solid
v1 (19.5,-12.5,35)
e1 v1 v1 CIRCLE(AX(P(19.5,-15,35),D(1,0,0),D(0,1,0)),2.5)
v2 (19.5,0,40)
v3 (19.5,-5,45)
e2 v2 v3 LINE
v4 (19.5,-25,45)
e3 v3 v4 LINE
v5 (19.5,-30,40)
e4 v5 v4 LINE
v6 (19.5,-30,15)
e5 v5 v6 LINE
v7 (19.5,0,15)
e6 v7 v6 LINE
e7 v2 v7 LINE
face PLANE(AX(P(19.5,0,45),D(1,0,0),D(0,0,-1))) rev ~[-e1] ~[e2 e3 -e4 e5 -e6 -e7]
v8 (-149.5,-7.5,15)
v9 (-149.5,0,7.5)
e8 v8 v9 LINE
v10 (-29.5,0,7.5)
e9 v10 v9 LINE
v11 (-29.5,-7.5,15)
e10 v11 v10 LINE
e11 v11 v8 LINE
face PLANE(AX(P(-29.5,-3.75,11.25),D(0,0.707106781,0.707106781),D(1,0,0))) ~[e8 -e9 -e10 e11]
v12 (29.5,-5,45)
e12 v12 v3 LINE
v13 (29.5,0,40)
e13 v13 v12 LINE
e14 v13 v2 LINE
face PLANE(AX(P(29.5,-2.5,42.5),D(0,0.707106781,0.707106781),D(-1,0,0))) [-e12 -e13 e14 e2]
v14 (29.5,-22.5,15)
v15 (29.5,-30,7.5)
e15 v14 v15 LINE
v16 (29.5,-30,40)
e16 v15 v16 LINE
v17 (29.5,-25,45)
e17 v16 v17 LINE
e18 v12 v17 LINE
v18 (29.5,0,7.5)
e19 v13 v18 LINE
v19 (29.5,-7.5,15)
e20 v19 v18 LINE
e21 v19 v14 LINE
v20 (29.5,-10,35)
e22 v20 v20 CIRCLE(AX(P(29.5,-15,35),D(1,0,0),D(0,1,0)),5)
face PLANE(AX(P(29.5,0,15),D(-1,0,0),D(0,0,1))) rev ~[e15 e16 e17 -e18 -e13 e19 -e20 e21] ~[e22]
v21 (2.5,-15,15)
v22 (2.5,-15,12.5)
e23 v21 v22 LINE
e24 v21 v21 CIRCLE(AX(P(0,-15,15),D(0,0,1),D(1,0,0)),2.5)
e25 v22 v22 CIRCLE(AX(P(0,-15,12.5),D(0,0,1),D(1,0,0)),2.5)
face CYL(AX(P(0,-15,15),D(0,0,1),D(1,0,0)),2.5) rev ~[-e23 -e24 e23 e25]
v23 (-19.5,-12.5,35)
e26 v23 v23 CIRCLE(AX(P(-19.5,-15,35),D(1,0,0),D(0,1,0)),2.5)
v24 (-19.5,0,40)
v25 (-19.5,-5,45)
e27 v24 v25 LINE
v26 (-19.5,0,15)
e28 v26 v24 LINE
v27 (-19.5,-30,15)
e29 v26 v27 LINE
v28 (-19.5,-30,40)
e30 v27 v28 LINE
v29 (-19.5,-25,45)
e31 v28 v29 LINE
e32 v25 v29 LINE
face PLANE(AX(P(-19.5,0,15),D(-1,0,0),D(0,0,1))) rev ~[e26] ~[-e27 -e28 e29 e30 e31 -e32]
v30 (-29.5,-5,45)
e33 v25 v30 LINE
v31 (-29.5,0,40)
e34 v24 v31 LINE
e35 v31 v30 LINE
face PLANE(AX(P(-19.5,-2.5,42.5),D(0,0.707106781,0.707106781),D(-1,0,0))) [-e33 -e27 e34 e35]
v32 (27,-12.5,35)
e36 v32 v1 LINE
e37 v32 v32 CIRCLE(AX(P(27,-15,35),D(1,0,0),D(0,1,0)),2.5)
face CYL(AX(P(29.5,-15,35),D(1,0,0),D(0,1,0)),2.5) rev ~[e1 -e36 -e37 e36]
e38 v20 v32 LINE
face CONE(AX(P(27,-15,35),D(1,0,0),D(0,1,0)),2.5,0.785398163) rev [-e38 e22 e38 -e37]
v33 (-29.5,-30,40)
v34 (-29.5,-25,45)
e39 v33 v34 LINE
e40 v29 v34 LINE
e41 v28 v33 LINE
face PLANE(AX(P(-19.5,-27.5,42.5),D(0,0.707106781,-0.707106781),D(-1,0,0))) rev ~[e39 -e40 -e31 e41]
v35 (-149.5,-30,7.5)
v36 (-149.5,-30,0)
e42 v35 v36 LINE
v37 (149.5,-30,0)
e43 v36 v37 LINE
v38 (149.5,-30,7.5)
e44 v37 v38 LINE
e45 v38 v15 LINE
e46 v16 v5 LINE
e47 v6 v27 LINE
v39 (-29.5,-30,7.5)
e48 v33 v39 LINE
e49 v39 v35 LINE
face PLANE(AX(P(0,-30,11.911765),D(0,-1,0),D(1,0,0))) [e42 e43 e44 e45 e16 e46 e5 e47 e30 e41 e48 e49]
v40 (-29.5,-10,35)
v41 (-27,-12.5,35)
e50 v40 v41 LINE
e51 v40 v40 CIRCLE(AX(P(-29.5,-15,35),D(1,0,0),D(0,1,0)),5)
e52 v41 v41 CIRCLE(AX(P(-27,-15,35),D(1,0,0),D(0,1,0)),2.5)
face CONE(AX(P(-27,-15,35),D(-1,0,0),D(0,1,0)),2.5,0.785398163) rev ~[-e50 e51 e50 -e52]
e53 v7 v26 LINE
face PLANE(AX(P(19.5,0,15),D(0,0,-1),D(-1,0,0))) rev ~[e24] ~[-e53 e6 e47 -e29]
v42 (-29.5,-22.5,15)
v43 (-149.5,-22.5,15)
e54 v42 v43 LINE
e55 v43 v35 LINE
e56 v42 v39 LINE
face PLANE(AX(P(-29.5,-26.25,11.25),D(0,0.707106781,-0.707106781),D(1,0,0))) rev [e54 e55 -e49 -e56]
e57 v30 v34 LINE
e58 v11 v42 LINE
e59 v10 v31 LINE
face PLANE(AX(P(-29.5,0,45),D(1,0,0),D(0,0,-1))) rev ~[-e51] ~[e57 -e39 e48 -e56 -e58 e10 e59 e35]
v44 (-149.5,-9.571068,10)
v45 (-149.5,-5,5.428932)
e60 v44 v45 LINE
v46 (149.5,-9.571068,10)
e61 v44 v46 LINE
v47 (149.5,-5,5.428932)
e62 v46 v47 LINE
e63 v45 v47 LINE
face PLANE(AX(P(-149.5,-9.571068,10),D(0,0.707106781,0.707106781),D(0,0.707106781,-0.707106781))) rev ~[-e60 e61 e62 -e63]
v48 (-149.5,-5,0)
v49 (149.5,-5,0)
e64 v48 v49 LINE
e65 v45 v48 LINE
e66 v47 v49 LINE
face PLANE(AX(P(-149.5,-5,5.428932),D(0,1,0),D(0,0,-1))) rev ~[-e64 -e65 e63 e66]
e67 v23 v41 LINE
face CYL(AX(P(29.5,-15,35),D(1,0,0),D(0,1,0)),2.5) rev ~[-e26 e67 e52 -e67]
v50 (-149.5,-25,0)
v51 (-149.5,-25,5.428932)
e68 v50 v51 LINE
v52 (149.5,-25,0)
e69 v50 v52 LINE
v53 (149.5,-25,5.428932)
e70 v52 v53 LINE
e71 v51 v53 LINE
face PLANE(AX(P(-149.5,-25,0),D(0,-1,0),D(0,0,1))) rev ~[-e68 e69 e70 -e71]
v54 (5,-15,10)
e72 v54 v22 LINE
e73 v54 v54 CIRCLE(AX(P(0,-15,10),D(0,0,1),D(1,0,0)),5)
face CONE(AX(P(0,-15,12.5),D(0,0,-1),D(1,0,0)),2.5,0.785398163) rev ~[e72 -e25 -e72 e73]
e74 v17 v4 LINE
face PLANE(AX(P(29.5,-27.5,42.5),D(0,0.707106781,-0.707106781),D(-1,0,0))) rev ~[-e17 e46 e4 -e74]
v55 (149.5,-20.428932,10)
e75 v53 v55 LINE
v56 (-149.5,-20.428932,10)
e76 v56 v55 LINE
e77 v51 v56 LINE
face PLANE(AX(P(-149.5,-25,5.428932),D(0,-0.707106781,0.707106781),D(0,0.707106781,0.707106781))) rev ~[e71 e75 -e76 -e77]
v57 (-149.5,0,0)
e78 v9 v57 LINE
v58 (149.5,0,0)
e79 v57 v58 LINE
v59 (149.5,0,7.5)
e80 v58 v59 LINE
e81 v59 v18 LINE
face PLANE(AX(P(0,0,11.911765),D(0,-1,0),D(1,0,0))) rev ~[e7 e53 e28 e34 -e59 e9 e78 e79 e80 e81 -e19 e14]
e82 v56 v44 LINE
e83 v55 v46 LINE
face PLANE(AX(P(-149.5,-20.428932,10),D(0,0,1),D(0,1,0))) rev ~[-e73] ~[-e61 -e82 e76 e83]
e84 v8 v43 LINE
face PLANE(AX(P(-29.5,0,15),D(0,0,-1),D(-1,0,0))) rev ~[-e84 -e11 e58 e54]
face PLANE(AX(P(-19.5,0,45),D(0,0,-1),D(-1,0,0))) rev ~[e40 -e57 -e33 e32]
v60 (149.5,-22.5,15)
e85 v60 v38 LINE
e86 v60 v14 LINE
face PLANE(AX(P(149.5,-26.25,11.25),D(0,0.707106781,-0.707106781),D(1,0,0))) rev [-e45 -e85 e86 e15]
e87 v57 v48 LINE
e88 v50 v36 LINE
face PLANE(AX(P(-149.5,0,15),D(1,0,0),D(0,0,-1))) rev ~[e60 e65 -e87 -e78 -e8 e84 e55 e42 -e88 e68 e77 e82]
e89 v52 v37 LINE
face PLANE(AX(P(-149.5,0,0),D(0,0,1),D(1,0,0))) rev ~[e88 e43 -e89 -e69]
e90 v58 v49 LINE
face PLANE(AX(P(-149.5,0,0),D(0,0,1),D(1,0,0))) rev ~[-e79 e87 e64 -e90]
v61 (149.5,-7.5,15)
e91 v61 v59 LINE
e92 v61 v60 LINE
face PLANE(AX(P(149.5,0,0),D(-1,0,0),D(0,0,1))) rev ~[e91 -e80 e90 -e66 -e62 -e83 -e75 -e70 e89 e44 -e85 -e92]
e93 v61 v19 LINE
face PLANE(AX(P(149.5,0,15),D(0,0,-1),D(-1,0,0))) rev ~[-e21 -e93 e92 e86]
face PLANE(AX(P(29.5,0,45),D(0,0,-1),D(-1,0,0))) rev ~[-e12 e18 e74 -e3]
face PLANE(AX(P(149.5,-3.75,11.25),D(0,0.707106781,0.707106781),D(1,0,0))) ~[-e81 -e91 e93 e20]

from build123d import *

# Parameters (mm, degrees)
F1_DEPTH = 30
F2_SIZE  = 7.5
F4_DEPTH = 299.001
F5_SIZE  = 5
F6_R     = 2.5
F7_DEPTH = 179.001
F8_R     = 2.5
F9_DEPTH = 15.001
F10_SIZE = 2.5


with BuildPart() as f1:
    # F0 (on Front) → F1 (new body)
    with BuildSketch(Plane.XZ):
        Polygon((-149.5, 0), (0, 0), (149.5, 0), (149.5, 15), (29.5, 15), (29.5, 45), (19.5, 45), (19.5, 15), (0, 15), (-19.5, 15), (-19.5, 45), (-29.5, 45), (-29.5, 15), (-149.5, 15), align=None)
    extrude(amount=F1_DEPTH)

    # F2
    f2_edges = [f1.edges().sort_by_distance(p)[0] for p in [
        (-89.5, -30, 15),
        (-89.5, 0, 15),
        (89.5, 0, 15),
        (89.5, -30, 15),
    ]]
    chamfer(f2_edges, length=F2_SIZE)

    # F3 (on face) → F4 (cut, through all)
    with BuildSketch(Plane(origin=(-149.5, 0, 0), x_dir=(0, -1, 0), z_dir=(-1, 0, 0))):
        Polygon((5.000000033, 5.4289321745), (5.000000033, 0), (24.999999967, 0), (24.999999967, 5.4289321745), (20.4289321745, 9.999999967), (9.5710678255, 9.999999967), align=None)
    extrude(amount=-F4_DEPTH, mode=Mode.SUBTRACT)

    # F5
    f5_edges = [f1.edges().sort_by_distance(p)[0] for p in [
        (-24.5, 0, 45),
        (-24.5, -30, 45),
        (24.5, 0, 45),
        (24.5, -30, 45),
    ]]
    chamfer(f5_edges, length=F5_SIZE)

    # F6 (on face) → F7 (cut, through all)
    with BuildSketch(Plane.YZ.offset(29.5)):
        with Locations((-15, 35)):
            Circle(F6_R)
    extrude(amount=-F7_DEPTH, mode=Mode.SUBTRACT)

    # F8 (on face) → F9 (cut, through all)
    with BuildSketch(Plane.XY.offset(15)):
        with Locations((0, -15)):
            Circle(F8_R)
    extrude(amount=-F9_DEPTH, mode=Mode.SUBTRACT)

    # F10
    f10_edges = [f1.edges().sort_by_distance(p)[0] for p in [
        (-29.5, -17.5, 35),
        (29.5, -17.5, 35),
        (-2.5, -15, 10),
    ]]
    chamfer(f10_edges, length=F10_SIZE)


solid = f1.part
